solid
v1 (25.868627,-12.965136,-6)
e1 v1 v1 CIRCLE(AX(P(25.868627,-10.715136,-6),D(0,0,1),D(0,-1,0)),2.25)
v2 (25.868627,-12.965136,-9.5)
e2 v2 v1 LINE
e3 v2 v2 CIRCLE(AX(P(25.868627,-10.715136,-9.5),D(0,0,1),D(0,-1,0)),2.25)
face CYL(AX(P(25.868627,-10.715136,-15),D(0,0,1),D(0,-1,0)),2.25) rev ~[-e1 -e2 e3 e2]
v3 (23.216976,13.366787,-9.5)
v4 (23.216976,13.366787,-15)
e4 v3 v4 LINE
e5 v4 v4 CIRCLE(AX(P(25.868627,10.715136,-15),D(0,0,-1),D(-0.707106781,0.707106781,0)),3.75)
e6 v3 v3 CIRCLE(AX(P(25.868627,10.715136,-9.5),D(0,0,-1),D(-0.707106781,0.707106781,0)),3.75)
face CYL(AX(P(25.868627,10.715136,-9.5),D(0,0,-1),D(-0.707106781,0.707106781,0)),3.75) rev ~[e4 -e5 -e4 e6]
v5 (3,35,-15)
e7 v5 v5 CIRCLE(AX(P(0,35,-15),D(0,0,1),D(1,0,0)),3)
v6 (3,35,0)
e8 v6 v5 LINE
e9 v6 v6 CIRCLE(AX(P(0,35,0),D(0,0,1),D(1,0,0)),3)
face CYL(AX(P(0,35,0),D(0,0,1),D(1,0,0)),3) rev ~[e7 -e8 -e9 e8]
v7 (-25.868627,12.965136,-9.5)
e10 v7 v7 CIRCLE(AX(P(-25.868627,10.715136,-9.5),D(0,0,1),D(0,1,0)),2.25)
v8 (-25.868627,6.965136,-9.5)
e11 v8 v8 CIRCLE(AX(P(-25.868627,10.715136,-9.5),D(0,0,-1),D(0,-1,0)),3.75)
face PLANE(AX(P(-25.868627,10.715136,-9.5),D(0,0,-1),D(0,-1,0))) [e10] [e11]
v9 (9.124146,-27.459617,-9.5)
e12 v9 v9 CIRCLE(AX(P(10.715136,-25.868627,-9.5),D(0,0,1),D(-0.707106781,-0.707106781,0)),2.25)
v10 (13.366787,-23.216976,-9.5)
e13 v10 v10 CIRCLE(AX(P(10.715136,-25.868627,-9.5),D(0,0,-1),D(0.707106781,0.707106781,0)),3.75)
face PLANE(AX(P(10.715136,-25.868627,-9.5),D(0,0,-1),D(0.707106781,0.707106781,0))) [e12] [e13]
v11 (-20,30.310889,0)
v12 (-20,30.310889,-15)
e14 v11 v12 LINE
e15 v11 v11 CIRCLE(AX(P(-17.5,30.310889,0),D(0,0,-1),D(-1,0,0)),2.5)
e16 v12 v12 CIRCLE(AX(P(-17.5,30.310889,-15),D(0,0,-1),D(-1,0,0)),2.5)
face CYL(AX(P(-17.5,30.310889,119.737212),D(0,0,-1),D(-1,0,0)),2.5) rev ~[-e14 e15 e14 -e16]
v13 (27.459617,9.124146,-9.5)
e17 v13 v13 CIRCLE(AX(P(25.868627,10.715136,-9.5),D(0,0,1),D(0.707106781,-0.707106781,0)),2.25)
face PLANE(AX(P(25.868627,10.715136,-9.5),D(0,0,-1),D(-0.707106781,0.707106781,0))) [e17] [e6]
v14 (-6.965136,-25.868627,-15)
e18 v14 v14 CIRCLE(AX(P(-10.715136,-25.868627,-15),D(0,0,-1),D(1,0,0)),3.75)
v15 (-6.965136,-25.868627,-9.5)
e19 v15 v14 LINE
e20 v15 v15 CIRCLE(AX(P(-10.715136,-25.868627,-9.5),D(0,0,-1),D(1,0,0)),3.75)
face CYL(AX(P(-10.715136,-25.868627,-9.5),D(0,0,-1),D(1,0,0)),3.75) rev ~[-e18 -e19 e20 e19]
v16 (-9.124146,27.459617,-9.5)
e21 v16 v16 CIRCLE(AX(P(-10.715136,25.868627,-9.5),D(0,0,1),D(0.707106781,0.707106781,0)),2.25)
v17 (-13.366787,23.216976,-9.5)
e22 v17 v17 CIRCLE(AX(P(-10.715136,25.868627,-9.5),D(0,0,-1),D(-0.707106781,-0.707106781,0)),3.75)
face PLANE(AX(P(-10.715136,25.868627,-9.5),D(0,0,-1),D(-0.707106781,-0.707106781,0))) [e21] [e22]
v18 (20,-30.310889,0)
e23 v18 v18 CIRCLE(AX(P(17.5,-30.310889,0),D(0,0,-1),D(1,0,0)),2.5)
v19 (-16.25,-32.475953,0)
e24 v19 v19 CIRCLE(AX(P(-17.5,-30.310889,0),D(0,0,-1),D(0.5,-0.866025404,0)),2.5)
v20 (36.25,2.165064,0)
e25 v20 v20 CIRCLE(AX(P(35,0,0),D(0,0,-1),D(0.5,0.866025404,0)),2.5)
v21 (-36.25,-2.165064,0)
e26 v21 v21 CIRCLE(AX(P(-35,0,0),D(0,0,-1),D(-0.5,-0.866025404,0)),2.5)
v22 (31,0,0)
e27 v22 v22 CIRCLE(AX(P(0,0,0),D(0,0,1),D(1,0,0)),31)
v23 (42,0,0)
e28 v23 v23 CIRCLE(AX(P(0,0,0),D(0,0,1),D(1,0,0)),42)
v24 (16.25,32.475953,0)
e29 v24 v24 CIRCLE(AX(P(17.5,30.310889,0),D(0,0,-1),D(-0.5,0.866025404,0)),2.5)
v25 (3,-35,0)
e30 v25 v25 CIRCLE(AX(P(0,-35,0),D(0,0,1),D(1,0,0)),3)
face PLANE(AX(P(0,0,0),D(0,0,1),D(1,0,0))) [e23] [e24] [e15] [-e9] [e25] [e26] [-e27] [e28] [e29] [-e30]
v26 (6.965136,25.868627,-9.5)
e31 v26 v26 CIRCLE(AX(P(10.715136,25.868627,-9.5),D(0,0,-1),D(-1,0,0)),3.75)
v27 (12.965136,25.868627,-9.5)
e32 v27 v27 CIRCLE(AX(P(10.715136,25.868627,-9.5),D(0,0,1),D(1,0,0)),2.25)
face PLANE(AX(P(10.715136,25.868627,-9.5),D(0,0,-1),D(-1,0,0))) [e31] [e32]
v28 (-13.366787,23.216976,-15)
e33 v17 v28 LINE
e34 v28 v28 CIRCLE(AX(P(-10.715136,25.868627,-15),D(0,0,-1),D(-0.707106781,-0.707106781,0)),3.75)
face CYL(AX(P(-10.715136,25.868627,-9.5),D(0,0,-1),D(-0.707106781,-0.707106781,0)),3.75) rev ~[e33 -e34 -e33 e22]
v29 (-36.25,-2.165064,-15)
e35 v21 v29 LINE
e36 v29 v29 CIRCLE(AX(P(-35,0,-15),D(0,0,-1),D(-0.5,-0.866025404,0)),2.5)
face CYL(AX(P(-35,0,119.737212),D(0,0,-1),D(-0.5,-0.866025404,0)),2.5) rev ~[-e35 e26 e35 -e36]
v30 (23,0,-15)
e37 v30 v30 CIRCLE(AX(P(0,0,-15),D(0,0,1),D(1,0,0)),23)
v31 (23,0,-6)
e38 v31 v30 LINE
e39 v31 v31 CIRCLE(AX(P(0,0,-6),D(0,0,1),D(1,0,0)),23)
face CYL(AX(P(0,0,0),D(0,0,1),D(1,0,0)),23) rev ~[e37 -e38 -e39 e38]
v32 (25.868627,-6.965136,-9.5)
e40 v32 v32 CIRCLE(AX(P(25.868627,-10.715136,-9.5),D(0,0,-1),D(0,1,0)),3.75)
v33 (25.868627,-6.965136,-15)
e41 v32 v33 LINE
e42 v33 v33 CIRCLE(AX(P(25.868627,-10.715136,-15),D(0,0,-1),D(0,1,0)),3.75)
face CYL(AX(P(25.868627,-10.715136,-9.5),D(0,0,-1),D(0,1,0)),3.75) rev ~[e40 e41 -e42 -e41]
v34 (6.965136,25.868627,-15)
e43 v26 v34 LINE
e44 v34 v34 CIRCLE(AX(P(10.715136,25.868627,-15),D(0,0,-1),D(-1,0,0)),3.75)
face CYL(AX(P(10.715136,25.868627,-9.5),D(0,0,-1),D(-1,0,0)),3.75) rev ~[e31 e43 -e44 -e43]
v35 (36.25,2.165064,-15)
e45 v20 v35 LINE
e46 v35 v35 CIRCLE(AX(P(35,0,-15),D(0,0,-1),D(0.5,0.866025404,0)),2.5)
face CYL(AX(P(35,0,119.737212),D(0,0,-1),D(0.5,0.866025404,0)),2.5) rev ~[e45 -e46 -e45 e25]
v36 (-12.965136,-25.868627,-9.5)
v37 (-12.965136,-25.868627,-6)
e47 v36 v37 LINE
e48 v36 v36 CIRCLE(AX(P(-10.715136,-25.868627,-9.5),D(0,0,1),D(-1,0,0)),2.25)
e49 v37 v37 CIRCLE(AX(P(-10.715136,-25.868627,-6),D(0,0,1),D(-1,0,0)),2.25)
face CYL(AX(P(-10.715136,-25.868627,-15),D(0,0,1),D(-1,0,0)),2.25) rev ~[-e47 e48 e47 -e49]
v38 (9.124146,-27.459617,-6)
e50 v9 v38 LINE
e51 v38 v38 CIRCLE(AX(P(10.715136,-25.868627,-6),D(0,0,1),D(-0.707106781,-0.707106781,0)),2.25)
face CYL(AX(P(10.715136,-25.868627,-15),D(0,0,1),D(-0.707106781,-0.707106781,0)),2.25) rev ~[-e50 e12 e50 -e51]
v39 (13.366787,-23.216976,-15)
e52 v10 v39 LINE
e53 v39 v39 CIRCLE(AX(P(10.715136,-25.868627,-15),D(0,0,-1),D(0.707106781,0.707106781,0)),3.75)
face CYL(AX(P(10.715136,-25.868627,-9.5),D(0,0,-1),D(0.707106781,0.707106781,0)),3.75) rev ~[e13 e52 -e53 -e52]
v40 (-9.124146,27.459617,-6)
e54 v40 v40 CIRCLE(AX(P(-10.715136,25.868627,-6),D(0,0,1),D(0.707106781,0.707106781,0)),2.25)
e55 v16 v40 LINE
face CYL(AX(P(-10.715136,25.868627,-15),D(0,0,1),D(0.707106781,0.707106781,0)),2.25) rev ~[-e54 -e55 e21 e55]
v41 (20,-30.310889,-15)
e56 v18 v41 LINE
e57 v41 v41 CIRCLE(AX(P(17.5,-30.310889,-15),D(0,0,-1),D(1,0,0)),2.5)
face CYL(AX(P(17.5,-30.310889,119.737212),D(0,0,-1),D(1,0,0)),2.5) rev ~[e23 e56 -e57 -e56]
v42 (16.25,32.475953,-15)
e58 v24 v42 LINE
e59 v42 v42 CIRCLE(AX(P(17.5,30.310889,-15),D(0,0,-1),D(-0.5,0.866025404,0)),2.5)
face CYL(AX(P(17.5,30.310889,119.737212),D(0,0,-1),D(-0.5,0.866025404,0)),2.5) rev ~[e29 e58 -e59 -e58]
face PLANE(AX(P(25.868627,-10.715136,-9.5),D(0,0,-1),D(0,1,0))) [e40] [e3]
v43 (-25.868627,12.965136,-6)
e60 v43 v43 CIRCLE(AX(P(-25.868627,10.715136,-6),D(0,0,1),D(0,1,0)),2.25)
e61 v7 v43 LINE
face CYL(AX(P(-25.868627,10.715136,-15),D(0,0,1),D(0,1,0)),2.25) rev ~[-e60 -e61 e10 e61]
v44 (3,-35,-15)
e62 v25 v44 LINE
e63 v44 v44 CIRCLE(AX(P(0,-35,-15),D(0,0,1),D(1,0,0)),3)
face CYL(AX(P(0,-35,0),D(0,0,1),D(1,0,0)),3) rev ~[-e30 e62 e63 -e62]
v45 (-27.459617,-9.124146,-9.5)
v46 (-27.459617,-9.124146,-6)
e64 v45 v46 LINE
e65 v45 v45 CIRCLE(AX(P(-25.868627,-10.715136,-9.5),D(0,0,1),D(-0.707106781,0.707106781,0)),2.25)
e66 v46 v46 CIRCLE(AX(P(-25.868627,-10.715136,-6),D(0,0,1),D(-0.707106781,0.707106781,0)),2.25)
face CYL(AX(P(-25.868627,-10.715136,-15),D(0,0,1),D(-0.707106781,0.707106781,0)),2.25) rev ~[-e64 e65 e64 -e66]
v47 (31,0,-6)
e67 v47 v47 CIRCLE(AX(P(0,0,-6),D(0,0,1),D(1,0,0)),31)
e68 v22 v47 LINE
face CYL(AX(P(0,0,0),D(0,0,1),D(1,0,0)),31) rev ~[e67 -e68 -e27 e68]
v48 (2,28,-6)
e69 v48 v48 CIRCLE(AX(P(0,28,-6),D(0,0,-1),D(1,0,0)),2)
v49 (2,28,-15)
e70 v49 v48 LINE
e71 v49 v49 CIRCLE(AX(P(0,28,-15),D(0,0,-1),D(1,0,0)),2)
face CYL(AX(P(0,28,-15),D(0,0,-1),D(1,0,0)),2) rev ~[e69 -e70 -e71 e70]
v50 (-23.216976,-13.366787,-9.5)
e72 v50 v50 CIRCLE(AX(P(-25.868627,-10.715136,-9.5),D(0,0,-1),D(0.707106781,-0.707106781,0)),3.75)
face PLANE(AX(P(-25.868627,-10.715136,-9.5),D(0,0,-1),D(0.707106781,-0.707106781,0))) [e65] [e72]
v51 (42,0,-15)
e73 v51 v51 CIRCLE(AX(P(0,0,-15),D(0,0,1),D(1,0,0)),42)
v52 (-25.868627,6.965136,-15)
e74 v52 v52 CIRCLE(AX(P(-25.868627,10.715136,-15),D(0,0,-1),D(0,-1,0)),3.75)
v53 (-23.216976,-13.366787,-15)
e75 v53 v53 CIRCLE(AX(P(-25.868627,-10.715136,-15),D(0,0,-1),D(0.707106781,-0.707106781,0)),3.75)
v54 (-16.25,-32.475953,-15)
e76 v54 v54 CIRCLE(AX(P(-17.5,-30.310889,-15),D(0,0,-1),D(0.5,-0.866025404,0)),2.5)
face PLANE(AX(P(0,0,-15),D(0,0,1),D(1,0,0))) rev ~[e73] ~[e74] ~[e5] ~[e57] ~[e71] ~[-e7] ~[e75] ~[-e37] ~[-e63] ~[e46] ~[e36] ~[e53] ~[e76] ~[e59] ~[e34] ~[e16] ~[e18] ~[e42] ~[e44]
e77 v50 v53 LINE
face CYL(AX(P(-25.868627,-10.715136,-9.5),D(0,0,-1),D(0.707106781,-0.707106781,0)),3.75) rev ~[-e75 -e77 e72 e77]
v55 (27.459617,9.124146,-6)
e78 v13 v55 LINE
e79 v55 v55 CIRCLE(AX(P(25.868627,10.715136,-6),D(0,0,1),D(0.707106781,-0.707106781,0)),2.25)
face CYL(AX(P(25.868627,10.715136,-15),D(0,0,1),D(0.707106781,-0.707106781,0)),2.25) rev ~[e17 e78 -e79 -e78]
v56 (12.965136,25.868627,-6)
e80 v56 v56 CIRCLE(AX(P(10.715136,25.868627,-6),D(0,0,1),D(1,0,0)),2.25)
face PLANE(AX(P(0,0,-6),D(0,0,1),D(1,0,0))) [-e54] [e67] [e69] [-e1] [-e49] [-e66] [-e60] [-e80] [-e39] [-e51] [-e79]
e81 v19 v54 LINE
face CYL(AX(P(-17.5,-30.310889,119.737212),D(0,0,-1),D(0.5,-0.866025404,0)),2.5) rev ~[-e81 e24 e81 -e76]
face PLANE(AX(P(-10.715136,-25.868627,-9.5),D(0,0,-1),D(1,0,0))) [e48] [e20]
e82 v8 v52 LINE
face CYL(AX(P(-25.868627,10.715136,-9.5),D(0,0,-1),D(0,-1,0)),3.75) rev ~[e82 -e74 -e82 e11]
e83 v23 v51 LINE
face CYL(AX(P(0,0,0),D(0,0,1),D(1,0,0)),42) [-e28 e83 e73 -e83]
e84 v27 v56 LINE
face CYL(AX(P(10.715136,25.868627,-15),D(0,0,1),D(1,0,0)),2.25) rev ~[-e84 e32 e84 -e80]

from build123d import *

# Parameters (mm, degrees)
F0_R             = 42
F0_R_2           = 23
F1_DEPTH         = 15
F2_R             = 31
F2_R_2           = 23
F3_DEPTH         = 6
F4_R             = 3
F5_DEPTH         = 15.001
F7_D             = 5
F7_COPIES_COUNT  = 6
F8_R             = 2
F9_DEPTH         = 15.001
F11_D            = 4.5
F11_CBORE_D      = 7.5
F11_CBORE_DEPTH  = 5.5
F11_COPIES_COUNT = 8


# Not quite as in the source:
# - a pattern or mirror of a feature is missing from the dataset's text; its kind, count and spacing are read off the source's solid


with BuildPart() as f1:
    # F0 (on Top) → F1 (new body)
    with BuildSketch(Plane.XY):
        Circle(F0_R)
        Circle(F0_R_2, mode=Mode.SUBTRACT)
    extrude(amount=-F1_DEPTH)

    # F2 (on face) → F3 (cut)
    with BuildSketch(Plane.XY):
        Circle(F2_R)
        Circle(F2_R_2, mode=Mode.SUBTRACT)
    extrude(amount=-F3_DEPTH, mode=Mode.SUBTRACT)

    # F4 (on face) → F5 (cut, through all)
    with BuildSketch(Plane.XY):
        with Locations((0, -35)):
            Circle(F4_R)
        with Locations((0, 35)):
            Circle(F4_R)
    extrude(amount=-F5_DEPTH, mode=Mode.SUBTRACT)

    # F7 (through all)
    with Locations(Plane.XY):
        with Locations((-17.5, 30.3108891325)):
            f7 = Hole(F7_D / 2)

    # F7_copies: F7 ×6 about axis
    f7_copies_axis = Axis((0, 0, 0), (0, 0, 1))
    for i in range(1, F7_COPIES_COUNT):
        add(f7.rotate(f7_copies_axis, i * 360 / F7_COPIES_COUNT), mode=Mode.SUBTRACT)

    # F8 (on face) → F9 (cut, through all)
    with BuildSketch(Plane(origin=(0, 0, -15), x_dir=(1, 0, 0), z_dir=(0, 0, -1))):
        with Locations((0, -28)):
            Circle(F8_R)
    extrude(amount=-F9_DEPTH, mode=Mode.SUBTRACT)

    # F11 (through all)
    with Locations(Plane(origin=(0, 0, -15), x_dir=(1, 0, 0), z_dir=(0, 0, -1))):
        with Locations((-10.7151361062, 25.8686269103)):
            f11 = CounterBoreHole(F11_D / 2, F11_CBORE_D / 2, F11_CBORE_DEPTH)

    # F11_copies: F11 ×8 about axis
    f11_copies_axis = Axis((0, 0, 0), (0, 0, 1))
    for i in range(1, F11_COPIES_COUNT):
        add(f11.rotate(f11_copies_axis, i * 360 / F11_COPIES_COUNT), mode=Mode.SUBTRACT)


solid = f1.part
